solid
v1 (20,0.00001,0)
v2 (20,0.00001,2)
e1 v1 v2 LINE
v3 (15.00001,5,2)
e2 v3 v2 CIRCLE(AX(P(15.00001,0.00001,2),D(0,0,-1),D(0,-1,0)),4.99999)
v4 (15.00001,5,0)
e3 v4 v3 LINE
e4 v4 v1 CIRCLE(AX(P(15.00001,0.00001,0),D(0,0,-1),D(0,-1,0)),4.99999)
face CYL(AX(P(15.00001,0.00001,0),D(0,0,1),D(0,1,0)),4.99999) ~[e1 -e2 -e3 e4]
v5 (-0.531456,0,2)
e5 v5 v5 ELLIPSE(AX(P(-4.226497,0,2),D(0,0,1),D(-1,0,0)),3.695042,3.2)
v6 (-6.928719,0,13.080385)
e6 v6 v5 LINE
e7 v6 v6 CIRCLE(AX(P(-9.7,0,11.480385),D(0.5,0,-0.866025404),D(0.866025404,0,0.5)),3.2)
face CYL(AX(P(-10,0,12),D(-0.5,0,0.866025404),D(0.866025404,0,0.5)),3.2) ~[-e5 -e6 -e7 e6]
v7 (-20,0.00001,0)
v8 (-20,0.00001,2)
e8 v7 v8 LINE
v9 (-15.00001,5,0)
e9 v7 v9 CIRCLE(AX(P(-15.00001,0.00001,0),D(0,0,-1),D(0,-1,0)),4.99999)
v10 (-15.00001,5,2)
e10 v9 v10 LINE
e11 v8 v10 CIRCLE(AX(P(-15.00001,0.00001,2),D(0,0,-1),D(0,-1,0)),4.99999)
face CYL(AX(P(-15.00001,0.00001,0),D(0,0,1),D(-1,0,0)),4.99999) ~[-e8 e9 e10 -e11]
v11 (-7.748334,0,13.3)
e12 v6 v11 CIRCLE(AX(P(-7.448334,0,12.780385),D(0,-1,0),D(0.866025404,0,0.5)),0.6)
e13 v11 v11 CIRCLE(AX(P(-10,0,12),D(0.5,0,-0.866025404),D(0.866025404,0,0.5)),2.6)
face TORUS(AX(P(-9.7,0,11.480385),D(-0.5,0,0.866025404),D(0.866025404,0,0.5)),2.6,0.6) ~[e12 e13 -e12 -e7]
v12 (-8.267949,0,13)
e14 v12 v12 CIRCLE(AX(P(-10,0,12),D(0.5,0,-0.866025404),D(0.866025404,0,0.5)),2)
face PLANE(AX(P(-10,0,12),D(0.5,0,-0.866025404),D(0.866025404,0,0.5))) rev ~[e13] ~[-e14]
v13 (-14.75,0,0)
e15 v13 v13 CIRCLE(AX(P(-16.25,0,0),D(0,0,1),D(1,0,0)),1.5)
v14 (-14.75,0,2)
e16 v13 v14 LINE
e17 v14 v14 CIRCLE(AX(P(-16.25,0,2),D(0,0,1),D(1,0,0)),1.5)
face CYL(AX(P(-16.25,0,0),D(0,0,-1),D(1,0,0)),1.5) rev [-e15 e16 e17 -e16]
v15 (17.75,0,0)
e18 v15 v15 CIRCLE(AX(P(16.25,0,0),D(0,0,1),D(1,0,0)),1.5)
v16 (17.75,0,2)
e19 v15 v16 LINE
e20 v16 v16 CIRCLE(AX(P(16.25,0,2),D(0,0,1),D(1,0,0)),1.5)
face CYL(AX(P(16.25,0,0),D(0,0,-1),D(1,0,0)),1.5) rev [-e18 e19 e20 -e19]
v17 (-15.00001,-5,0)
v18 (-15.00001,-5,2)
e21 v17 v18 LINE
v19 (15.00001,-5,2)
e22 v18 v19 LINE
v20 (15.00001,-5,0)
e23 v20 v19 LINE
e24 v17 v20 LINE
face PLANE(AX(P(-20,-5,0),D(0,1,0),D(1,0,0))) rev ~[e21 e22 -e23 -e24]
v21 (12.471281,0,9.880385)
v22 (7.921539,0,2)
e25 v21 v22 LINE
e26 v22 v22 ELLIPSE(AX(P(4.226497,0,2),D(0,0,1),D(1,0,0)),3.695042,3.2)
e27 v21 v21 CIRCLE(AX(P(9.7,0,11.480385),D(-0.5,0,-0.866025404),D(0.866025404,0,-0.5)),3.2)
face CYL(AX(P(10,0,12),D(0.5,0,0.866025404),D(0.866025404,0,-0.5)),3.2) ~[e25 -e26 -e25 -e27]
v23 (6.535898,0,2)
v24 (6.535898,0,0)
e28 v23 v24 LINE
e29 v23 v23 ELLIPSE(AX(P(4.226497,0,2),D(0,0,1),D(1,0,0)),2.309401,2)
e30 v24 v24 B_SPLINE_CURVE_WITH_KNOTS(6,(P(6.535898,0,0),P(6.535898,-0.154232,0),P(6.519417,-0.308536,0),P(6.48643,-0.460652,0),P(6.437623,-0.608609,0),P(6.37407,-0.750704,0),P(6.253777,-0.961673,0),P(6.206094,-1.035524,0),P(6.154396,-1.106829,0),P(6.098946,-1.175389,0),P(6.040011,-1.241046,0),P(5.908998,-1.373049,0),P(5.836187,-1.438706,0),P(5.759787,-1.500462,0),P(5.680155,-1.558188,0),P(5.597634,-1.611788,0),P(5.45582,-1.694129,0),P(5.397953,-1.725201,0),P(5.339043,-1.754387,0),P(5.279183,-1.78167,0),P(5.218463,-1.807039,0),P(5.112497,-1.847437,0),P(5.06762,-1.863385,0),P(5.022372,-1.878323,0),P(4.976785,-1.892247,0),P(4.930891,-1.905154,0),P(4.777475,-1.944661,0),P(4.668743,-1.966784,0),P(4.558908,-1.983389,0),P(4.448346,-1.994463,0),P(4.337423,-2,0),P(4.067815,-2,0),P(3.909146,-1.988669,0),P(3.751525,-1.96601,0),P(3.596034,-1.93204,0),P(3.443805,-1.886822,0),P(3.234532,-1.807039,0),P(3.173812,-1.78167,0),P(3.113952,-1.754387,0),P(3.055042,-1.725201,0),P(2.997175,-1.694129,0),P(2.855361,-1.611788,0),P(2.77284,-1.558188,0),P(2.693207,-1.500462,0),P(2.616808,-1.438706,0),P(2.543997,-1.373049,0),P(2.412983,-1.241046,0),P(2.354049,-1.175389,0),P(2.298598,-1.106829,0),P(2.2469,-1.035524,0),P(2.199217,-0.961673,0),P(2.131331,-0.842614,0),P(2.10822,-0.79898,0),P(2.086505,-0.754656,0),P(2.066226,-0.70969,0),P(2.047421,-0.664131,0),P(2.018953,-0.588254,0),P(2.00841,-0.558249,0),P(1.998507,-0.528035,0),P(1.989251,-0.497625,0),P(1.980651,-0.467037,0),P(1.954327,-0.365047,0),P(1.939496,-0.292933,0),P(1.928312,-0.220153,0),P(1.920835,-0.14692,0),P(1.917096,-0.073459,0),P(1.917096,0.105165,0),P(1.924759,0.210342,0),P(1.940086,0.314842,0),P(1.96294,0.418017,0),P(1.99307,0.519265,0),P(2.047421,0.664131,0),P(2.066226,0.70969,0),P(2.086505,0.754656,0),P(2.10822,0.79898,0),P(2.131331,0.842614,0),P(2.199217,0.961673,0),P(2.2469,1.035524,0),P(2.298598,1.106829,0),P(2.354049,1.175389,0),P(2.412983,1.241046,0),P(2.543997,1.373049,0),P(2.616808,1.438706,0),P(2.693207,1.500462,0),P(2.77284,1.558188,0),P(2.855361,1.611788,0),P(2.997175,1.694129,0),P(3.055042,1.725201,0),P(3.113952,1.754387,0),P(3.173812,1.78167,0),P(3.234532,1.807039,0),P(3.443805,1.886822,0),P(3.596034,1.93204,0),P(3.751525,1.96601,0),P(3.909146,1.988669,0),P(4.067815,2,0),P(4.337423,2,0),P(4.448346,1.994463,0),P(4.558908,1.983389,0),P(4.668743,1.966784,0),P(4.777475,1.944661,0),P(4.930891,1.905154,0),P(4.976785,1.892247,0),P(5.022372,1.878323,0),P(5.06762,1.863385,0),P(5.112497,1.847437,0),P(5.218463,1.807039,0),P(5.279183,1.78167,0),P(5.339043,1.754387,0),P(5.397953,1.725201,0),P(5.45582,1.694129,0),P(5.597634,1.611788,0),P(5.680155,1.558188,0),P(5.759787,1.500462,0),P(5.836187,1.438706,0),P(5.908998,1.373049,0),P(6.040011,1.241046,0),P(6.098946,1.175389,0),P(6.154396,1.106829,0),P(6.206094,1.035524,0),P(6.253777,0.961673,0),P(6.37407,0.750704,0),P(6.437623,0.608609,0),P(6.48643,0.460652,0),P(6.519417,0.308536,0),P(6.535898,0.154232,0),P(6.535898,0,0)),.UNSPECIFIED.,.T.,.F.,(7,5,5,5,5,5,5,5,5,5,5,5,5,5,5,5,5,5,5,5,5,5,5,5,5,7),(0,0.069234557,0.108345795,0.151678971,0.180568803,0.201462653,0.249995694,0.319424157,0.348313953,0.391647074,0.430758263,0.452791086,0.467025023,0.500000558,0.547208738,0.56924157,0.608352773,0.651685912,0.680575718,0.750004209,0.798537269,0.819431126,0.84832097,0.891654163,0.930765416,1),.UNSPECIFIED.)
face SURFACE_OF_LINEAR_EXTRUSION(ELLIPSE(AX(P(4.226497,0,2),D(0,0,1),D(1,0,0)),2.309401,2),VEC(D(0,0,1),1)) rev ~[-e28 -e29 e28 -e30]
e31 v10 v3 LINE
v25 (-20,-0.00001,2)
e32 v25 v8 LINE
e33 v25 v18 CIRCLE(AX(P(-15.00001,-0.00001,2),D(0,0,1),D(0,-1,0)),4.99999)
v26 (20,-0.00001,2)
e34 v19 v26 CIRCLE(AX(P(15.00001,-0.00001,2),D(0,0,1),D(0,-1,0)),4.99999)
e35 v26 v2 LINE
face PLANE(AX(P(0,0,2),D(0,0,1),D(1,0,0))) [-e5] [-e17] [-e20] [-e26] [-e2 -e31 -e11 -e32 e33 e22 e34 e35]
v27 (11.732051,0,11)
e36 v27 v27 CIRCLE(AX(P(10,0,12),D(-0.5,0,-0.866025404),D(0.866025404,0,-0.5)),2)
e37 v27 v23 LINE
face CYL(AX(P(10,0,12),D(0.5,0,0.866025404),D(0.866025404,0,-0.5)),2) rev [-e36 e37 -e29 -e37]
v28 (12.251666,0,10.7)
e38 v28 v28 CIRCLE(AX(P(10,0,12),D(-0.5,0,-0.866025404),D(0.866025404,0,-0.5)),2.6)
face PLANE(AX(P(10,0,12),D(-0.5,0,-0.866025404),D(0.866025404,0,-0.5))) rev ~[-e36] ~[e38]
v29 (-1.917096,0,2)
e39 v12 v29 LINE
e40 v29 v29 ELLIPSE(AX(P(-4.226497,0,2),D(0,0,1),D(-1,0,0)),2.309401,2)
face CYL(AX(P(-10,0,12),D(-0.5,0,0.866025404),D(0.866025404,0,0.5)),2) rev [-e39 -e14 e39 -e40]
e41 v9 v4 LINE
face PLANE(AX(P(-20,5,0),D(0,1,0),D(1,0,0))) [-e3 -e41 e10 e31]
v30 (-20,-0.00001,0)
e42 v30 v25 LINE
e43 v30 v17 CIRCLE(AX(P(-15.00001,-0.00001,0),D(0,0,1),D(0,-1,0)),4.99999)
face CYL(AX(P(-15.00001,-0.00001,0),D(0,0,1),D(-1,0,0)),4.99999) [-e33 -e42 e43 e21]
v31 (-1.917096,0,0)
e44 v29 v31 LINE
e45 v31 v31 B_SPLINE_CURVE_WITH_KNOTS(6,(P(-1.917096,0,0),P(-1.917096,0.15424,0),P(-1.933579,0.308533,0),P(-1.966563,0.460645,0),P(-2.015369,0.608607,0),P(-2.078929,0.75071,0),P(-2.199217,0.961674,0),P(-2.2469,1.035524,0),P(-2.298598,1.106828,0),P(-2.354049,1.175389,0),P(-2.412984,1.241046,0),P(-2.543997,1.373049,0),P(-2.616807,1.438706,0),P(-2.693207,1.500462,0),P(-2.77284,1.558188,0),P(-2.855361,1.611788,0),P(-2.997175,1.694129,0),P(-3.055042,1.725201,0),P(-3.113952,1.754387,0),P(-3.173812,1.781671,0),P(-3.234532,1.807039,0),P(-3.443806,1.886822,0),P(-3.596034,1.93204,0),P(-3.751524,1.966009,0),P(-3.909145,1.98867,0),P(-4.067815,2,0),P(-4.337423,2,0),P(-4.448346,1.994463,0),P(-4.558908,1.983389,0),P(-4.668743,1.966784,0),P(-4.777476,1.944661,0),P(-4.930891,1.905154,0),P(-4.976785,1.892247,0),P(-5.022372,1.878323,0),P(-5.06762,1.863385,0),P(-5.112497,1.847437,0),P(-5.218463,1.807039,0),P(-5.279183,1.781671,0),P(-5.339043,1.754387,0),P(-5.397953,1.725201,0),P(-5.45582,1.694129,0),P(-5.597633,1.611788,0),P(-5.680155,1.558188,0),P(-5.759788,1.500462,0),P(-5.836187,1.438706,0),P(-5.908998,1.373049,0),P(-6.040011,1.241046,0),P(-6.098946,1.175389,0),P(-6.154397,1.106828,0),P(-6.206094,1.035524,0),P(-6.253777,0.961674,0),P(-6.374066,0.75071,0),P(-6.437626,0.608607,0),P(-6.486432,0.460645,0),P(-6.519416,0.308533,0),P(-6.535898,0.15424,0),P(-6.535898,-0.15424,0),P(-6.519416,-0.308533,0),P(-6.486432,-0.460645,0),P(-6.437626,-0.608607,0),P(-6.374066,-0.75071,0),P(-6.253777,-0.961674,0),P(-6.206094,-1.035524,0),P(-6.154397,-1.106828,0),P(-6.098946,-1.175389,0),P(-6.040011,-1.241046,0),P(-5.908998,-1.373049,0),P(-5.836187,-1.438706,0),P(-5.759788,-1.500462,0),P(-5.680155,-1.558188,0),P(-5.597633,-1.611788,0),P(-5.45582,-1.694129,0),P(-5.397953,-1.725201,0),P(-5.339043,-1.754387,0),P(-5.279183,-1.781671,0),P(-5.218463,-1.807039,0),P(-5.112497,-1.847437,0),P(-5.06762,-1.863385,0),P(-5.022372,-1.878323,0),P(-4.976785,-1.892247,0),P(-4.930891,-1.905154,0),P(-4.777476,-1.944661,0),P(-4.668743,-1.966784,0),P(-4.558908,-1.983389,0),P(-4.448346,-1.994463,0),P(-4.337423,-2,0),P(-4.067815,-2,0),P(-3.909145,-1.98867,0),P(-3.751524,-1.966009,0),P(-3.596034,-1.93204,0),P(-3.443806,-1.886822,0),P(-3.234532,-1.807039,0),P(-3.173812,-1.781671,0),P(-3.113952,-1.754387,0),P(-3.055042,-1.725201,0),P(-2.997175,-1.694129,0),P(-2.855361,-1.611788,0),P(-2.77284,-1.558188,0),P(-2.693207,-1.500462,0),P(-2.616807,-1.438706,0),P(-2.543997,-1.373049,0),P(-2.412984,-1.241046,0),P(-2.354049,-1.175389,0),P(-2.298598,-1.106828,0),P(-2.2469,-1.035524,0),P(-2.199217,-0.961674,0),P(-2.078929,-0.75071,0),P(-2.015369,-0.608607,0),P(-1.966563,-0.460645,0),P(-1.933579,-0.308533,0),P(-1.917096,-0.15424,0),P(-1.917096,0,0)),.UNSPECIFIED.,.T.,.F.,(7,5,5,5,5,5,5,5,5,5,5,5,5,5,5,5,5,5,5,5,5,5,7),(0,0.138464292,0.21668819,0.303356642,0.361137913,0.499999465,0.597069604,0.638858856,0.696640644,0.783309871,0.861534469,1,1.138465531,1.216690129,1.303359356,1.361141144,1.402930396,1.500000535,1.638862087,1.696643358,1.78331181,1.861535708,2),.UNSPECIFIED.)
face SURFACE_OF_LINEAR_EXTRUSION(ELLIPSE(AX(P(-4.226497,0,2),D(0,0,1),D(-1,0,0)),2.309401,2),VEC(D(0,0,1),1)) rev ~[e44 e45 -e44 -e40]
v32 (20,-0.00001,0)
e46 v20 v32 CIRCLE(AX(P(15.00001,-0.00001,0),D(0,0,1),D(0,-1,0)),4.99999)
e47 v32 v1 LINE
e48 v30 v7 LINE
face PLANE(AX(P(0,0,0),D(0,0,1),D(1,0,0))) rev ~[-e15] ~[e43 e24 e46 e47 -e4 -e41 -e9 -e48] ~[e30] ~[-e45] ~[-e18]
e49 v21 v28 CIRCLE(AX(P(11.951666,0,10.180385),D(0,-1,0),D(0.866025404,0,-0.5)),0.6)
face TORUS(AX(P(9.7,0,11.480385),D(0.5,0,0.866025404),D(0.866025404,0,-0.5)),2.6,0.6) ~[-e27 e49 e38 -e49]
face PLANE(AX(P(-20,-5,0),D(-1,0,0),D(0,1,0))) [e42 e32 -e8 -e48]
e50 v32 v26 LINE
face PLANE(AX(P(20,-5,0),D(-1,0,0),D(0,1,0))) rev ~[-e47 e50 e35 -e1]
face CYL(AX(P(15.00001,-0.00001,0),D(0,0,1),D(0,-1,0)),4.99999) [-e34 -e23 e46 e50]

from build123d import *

# Parameters (mm, degrees)
F0_W      = 40
F0_H      = 10
F0_R      = 1.5
F1_DEPTH  = 2
F7_R      = 3.2
F7_R_2    = 2
F9_R      = 3.2
F9_R_2    = 2
F11_R     = 4.99999
F12_DEPTH = 2.001
F13_DEPTH = 2.0010001
F14_R     = 0.6


# Not quite as in the source:
# - a fillet or chamfer is up to 0.001 mm smaller than in the source, because OpenCascade refuses the exact size


with BuildPart() as f1:
    # F0 (on Top) → F1 (new body)
    with BuildSketch(Plane.XY):
        Rectangle(F0_W, F0_H)
        with Locations((-16.25, 0)):
            Circle(F0_R, mode=Mode.SUBTRACT)
        with Locations((16.25, 0)):
            Circle(F0_R, mode=Mode.SUBTRACT)
    extrude(amount=F1_DEPTH)

    # F7 (on line) → F8 (join, up to the next surface of F1)
    with BuildSketch(Plane(origin=(7.6961524227, 0, 13.3301270189), x_dir=(0.8660254038, 0, -0.5), z_dir=(-0.5, 0, -0.8660254038))):
        with Locations((2.6602540378, 0)):
            Circle(F7_R)
        with Locations((2.6602540378, 0)):
            Circle(F7_R_2, mode=Mode.SUBTRACT)
    extrude(until=Until.NEXT)

    # F9 (on line) → F10 (join, up to the next surface of F1)
    with BuildSketch(Plane(origin=(-7.6961524227, 0, 13.3301270189), x_dir=(0.8660254038, 0, 0.5), z_dir=(0.5, 0, -0.8660254038))):
        with Locations((-2.6602540378, 0)):
            Circle(F9_R)
        with Locations((-2.6602540378, 0)):
            Circle(F9_R_2, mode=Mode.SUBTRACT)
    extrude(until=Until.NEXT)

    # F11 (radius 5 in the source; OpenCascade refuses exactly that, so slightly less here)
    f11_edges = [f1.edges().sort_by_distance(p)[0] for p in [
        (-20, -5, 1),
        (20, -5, 1),
        (20, 5, 1),
        (-20, 5, 1),
    ]]
    fillet(f11_edges, radius=F11_R)

    # F12 (cut, through all): a face of the model
    f12_faces = [f1.faces().sort_by_distance(p)[0] for p in [
        (-4.2264973081, 0, 2),
    ]]
    extrude(f12_faces, amount=-F12_DEPTH, mode=Mode.SUBTRACT)

    # F13 (cut, through all): a face of the model
    f13_faces = [f1.faces().sort_by_distance(p)[0] for p in [
        (4.2264973081, 0, 2),
    ]]
    extrude(f13_faces, amount=-F13_DEPTH, mode=Mode.SUBTRACT)

    # F14
    f14_edges = [f1.edges().sort_by_distance(p)[0] for p in [
        (-12.771281, 0, 10.4),
        (7.228719, 0, 13.6),
    ]]
    fillet(f14_edges, radius=F14_R)


solid = f1.part
